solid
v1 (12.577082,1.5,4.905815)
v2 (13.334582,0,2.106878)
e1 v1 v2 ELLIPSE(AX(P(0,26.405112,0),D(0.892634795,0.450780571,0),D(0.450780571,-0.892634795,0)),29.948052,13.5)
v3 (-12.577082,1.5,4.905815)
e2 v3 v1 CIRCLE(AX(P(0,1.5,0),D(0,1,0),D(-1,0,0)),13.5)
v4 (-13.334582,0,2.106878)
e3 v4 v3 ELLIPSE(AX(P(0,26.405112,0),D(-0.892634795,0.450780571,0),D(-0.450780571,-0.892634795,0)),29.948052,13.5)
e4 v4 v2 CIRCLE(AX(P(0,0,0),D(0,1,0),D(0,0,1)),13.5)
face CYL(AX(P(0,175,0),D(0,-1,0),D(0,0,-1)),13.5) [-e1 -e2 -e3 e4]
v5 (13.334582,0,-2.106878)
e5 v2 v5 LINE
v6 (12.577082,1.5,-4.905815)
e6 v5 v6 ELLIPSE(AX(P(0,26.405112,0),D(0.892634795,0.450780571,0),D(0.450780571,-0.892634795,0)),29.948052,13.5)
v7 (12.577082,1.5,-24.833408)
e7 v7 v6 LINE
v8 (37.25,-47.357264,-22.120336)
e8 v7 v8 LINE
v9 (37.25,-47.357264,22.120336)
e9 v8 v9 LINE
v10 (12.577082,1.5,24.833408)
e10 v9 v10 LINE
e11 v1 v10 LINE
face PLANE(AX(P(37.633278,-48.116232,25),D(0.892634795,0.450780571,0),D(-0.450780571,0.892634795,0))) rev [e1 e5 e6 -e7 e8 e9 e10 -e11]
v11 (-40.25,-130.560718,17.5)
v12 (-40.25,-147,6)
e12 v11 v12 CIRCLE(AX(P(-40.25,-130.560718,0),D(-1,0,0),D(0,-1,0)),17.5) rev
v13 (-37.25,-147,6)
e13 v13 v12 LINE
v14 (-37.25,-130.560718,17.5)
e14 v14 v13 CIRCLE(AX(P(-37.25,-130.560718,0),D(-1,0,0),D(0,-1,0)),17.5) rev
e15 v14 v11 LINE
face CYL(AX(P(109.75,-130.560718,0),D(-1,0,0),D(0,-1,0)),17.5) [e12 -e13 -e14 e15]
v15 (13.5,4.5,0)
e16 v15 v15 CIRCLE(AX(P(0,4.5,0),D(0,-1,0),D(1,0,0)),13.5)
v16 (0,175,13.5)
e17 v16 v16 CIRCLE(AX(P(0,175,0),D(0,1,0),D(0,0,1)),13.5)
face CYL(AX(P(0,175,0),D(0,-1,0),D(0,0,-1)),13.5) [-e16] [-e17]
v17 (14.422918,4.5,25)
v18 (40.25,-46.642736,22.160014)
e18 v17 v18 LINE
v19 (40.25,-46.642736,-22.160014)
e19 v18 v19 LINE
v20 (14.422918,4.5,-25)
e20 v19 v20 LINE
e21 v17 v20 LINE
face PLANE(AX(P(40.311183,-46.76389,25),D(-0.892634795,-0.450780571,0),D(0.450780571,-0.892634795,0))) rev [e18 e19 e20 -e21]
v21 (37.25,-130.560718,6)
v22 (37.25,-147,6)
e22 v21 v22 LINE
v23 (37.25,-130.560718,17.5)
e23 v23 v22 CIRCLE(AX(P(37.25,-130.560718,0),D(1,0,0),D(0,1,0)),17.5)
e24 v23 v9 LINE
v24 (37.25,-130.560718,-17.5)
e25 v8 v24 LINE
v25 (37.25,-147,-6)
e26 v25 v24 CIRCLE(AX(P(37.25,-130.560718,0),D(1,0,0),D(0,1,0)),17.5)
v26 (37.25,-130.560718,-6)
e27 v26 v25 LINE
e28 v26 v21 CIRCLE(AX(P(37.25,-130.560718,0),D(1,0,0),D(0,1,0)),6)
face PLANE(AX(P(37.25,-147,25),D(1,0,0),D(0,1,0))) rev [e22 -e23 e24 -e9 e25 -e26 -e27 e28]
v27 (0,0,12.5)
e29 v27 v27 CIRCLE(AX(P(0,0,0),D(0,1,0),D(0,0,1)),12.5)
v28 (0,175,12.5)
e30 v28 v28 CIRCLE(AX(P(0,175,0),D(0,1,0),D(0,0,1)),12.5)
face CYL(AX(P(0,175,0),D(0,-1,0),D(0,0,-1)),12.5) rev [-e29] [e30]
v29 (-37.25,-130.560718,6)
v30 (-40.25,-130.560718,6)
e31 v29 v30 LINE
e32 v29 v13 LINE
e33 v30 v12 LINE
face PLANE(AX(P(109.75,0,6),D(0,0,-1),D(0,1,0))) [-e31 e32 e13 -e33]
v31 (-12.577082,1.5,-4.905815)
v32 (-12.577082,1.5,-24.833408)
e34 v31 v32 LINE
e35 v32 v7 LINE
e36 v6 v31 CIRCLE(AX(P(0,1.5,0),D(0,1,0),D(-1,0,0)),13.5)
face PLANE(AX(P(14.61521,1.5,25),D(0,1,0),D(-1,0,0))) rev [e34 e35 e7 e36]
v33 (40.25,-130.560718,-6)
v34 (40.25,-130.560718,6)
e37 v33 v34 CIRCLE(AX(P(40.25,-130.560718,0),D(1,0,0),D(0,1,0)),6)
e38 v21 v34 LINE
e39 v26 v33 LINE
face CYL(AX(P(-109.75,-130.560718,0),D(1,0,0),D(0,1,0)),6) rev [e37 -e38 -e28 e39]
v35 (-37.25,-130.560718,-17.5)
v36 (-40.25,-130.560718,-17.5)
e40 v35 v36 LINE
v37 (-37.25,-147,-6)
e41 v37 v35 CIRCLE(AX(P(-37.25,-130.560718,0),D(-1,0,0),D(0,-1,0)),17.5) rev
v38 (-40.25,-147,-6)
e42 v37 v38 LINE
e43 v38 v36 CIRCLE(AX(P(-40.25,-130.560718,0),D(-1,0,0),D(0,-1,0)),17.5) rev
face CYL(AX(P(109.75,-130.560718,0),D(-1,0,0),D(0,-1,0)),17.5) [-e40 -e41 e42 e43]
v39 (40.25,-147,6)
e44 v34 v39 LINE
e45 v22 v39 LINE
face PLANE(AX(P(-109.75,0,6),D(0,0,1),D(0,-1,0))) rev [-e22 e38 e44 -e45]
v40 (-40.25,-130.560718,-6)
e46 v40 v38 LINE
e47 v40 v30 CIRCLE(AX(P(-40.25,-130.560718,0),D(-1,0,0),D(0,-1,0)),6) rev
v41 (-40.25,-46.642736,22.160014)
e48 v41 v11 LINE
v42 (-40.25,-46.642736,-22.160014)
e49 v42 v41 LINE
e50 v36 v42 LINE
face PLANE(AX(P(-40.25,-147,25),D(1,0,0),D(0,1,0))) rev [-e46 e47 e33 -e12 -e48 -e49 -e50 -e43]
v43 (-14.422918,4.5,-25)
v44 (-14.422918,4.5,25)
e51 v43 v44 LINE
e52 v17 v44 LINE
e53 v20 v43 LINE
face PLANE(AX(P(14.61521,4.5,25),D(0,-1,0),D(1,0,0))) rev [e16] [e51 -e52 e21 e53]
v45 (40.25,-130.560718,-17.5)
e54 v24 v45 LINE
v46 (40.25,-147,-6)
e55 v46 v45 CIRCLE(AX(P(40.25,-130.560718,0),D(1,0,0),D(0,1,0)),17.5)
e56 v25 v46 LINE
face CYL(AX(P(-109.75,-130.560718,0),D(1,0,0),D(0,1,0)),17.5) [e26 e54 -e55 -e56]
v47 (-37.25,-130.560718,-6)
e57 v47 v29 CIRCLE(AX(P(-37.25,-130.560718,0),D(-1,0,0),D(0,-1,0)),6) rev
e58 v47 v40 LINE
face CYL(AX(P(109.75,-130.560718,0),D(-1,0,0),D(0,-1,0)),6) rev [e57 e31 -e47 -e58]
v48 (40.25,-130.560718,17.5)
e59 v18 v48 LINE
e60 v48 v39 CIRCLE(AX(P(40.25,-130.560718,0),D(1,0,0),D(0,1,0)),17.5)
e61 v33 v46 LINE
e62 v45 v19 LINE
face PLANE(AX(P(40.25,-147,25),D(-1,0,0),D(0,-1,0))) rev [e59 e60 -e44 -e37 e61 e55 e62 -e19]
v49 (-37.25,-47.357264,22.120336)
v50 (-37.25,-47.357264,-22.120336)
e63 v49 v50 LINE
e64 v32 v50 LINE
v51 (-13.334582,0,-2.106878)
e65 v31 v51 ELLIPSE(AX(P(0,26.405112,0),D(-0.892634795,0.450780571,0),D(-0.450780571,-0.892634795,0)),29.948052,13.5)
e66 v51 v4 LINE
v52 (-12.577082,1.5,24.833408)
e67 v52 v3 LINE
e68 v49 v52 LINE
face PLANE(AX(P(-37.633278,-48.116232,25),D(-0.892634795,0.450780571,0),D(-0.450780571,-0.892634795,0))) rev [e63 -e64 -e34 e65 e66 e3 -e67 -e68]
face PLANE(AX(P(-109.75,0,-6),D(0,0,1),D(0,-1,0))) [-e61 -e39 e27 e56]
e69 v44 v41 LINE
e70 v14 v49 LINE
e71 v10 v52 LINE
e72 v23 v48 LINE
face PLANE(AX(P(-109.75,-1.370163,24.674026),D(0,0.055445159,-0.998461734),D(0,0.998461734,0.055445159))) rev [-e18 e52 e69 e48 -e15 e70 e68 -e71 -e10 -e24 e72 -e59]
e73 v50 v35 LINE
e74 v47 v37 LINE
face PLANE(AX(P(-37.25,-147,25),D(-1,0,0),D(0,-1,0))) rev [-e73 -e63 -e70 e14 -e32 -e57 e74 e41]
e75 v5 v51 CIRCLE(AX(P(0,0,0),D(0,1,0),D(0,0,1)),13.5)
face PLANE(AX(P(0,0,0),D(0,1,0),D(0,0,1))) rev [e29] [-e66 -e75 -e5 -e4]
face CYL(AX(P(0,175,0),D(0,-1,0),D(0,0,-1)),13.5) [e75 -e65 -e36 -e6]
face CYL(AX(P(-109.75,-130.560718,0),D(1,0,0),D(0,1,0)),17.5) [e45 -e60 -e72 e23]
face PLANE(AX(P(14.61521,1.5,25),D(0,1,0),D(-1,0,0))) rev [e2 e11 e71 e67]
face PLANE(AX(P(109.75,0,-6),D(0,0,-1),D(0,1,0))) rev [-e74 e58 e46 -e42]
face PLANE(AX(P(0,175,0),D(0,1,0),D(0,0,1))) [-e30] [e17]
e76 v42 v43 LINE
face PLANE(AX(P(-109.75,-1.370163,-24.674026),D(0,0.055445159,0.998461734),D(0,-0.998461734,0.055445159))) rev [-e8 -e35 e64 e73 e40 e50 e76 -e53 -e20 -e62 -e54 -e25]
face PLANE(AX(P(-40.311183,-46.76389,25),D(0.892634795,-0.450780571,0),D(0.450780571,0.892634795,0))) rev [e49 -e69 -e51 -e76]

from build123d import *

# Parameters (mm, degrees)
SKETCH1_R           = 13.5
SKETCH1_R_2         = 12.5
BOSS_EXTRUDE1_DEPTH = 175
SKETCH3_W           = 50
SKETCH3_H           = 3
CUT_EXTRUDE1_START  = -40.25
CUT_EXTRUDE1_DEPTH  = 40.25
CUT_EXTRUDE2_REACH  = 181.854
SKETCH5_R           = 12.5


# Read off the part's stored shape, not the designer's step: Cut-Extrude1
with BuildPart() as part:
    # Sketch1 → Boss-Extrude1 (new body)
    with BuildSketch(Plane(origin=(0, 0, 0), x_dir=(1, 0, 0), z_dir=(0, 1, 0))):
        with Locations(Location((0, 0, 0), (0, 0, 270))):
            Circle(SKETCH1_R)
        with Locations(Location((0, 0, 0), (0, 0, 270))):
            Circle(SKETCH1_R_2, mode=Mode.SUBTRACT)
    extrude(amount=BOSS_EXTRUDE1_DEPTH)

    # Sweep1: sweep along a path in Sketch2
    with BuildLine(Plane.XY) as sweep1_path:
        Line((38.75, -147), (38.75, -47))
        Line((38.75, -47), (13.5, 3))
        Line((13.5, 3), (0, 3))
    # Sketch3 → Sweep1 (sweep)
    with BuildSketch(Plane(origin=(0, 0, 0), x_dir=(0, 0, -1), z_dir=(1, 0, 0))):
        with Locations((0, 3)):
            Rectangle(SKETCH3_W, SKETCH3_H)
    sweep1 = sweep(path=sweep1_path.line, transition=Transition.RIGHT)

    # Cut-Extrude1 outline → Cut-Extrude1 (cut)
    with BuildSketch(Plane(origin=(40.25, 0, 0), x_dir=(0, 0, -1), z_dir=(1, 0, 0)).offset(CUT_EXTRUDE1_START)):
        with BuildLine():
            Line((25, -147), (25, 4.5))
            Line((25, 4.5), (17.5, -130.560717777))
            ThreePointArc((17.5, -130.560717777), (14.3396304, -140.591919101), (6, -147))
            Line((6, -147), (25, -147))
        make_face()
        with BuildLine():
            Line((-25, -147), (-6, -147))
            ThreePointArc((-6, -147), (-14.3396304, -140.591919101), (-17.5, -130.560717777))
            Line((-17.5, -130.560717777), (-25, 4.5))
            Line((-25, 4.5), (-25, -147))
        make_face()
        with BuildLine():
            Line((-6, -147), (6, -147))
            Line((6, -147), (6, -130.560717777))
            ThreePointArc((6, -130.560717777), (0, -124.560717777), (-6, -130.560717777))
            Line((-6, -130.560717777), (-6, -147))
        make_face()
    cut_extrude1 = extrude(amount=CUT_EXTRUDE1_DEPTH, mode=Mode.SUBTRACT)

    # Mirror1: Sweep1, Cut-Extrude1 across plane
    add(sweep1.mirror(Plane(origin=(0, 0, 0), x_dir=(0, 0, 1), z_dir=(1, 0, 0))))
    add(cut_extrude1.mirror(Plane(origin=(0, 0, 0), x_dir=(0, 0, 1), z_dir=(1, 0, 0))), mode=Mode.SUBTRACT)

    # Sketch5 → Cut-Extrude2 (cut, up to next)
    with BuildSketch(Plane.XZ.offset(-1.5), mode=Mode.PRIVATE) as cut_extrude2_sk1:
        with Locations(Location((0, 0, 0), (0, 0, 90))):
            Circle(SKETCH5_R)
    cut_extrude2_tool1 = extrude(cut_extrude2_sk1.sketch, amount=-CUT_EXTRUDE2_REACH, mode=Mode.PRIVATE) & part.part
    add(cut_extrude2_tool1.solids().sort_by_distance((0, 1.5, 0))[0], mode=Mode.SUBTRACT)


solid = part.part
